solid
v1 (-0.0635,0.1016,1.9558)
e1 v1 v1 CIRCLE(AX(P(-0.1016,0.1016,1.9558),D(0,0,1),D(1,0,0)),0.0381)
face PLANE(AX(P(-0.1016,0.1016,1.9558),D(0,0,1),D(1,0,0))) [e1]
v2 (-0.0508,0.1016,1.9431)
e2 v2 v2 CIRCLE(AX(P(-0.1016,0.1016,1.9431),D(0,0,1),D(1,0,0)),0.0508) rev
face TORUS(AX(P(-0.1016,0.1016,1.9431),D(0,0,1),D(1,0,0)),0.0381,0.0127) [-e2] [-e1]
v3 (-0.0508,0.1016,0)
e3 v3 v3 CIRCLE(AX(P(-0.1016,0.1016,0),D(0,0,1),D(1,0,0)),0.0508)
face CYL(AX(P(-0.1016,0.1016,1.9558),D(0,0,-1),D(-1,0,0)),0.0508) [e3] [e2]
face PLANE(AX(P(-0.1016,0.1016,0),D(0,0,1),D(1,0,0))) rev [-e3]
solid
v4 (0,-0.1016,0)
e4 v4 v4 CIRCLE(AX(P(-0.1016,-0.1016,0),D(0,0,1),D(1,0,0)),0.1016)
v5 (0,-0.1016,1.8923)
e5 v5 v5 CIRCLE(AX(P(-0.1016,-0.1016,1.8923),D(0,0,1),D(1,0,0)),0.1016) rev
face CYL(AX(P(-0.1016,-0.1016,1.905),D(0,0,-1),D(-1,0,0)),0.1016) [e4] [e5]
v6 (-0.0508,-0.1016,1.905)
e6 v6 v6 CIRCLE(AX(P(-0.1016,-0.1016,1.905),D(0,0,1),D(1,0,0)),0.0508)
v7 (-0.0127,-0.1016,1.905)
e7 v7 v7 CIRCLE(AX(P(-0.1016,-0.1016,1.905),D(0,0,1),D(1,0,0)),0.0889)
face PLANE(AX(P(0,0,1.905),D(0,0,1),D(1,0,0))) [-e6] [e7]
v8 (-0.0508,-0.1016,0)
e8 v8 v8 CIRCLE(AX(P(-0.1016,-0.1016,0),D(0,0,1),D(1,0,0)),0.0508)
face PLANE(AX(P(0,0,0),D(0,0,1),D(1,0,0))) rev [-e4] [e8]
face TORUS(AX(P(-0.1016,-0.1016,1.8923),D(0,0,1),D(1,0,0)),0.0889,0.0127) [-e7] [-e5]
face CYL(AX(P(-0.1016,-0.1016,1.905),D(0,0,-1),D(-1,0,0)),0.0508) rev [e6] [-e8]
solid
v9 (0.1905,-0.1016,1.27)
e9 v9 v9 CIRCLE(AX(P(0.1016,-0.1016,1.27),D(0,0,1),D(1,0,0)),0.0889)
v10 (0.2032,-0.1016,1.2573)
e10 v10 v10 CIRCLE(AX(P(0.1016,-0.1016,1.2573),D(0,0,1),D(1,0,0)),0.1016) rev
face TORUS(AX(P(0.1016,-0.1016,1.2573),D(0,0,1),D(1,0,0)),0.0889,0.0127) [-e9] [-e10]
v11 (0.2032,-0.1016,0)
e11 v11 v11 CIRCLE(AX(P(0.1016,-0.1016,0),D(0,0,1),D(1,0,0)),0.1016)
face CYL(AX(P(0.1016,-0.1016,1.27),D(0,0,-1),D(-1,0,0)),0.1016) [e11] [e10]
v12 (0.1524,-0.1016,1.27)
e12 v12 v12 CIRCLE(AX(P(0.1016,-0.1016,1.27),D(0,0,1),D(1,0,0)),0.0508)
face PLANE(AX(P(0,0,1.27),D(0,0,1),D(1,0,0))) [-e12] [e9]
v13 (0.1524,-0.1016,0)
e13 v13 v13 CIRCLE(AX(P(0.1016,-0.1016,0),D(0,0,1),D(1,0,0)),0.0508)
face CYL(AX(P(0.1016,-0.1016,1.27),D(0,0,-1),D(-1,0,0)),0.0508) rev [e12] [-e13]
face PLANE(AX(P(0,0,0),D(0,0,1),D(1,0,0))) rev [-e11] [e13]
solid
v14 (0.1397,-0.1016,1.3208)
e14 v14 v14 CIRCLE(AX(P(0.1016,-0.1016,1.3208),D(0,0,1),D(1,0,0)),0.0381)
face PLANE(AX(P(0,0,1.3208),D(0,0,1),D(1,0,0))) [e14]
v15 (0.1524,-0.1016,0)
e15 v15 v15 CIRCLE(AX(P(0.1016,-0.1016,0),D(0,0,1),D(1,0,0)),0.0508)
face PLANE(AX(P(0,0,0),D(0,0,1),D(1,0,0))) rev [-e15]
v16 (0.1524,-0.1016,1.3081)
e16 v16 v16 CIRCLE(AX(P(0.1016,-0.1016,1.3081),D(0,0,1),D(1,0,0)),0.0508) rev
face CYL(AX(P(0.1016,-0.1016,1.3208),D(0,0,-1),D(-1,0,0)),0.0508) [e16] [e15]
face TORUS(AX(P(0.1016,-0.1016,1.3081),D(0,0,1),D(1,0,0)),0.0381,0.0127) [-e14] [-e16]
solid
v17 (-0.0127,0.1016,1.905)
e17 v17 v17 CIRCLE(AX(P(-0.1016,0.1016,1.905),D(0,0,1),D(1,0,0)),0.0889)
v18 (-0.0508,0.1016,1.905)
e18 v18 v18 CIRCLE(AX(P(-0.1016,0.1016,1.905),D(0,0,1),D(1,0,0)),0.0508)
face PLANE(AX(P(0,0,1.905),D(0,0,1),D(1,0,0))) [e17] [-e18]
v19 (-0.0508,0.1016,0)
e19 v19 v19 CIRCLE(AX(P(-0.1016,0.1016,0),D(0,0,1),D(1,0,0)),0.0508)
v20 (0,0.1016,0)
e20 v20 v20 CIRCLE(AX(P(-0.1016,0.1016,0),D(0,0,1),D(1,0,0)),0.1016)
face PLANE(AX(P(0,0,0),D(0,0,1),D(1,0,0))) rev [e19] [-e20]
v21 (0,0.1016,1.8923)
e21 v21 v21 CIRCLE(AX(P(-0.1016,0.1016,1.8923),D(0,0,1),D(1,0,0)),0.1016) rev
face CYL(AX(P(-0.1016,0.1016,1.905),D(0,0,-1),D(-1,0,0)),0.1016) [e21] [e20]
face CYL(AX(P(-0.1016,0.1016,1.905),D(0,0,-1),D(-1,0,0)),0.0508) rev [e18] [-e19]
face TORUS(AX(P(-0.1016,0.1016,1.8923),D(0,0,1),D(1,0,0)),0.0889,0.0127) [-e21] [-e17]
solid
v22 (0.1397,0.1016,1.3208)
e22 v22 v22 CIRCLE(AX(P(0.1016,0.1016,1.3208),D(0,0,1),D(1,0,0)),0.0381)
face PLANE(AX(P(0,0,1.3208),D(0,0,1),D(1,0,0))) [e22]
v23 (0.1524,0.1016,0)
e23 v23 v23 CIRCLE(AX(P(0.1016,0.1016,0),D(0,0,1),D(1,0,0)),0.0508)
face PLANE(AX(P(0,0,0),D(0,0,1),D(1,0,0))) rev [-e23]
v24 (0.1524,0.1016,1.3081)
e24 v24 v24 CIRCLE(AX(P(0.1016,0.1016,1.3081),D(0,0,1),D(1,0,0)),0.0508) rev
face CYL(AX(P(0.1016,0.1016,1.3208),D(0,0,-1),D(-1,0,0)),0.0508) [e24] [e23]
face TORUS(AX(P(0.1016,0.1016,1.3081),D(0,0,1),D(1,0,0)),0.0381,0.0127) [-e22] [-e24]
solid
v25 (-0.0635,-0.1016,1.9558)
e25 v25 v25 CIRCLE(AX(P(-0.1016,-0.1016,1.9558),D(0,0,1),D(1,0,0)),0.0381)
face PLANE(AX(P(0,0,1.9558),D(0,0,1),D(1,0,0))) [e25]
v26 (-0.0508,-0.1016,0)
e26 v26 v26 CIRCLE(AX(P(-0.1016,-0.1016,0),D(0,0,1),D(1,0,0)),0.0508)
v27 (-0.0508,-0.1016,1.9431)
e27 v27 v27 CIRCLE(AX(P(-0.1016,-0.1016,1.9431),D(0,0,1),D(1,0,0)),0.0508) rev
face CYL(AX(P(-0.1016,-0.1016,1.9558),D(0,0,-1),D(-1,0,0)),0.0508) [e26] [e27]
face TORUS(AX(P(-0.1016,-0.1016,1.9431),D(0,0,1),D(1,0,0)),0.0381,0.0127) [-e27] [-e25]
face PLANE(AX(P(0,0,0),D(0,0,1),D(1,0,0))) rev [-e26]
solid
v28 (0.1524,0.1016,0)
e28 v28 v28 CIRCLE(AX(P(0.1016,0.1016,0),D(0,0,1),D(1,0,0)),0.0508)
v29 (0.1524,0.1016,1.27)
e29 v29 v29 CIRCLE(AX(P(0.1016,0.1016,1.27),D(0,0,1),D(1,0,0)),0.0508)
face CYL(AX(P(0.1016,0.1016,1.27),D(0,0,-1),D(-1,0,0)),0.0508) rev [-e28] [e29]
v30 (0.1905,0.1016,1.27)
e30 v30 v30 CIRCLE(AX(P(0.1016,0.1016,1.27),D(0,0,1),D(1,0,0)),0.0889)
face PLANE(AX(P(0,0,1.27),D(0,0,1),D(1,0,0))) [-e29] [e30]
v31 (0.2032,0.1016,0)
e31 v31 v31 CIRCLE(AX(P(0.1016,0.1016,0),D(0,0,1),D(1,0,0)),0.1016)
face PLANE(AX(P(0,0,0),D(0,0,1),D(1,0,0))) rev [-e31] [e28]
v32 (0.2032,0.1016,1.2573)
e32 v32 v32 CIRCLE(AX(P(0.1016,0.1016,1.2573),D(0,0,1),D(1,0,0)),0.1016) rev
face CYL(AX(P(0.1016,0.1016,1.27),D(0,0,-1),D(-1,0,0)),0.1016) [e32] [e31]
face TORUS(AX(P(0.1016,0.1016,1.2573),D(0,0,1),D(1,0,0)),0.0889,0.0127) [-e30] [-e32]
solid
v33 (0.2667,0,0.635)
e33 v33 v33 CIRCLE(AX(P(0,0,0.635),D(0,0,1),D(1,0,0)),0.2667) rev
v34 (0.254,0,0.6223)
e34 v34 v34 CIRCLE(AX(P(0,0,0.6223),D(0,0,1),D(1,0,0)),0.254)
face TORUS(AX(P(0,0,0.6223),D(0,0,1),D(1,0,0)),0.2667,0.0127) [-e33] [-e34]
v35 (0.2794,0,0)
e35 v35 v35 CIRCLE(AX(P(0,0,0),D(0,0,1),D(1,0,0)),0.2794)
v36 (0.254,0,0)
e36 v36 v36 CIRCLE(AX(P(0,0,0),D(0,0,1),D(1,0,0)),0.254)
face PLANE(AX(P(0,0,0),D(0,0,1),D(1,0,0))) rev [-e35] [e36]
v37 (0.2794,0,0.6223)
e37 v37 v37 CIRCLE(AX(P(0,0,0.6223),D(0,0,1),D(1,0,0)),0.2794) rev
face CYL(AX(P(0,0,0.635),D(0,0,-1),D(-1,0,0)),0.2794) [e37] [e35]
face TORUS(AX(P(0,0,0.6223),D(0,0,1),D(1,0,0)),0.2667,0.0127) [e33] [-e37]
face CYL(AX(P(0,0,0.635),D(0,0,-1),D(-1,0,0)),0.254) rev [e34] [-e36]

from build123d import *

# Parameters (mm, degrees)
SKETCH1_R            = 0.1016
SKETCH1_R_2          = 0.0508
BOSS_EXTRUDE4_DEPTH  = 1.905
SKETCH1_12_R         = 0.1016
SKETCH1_12_R_2       = 0.0508
BOSS_EXTRUDE9_DEPTH  = 1.27
SKETCH1_13_R         = 0.1016
SKETCH1_13_R_2       = 0.0508
BOSS_EXTRUDE10_DEPTH = 1.27
SKETCH1_14_R         = 0.2794
SKETCH1_14_R_2       = 0.254
BOSS_EXTRUDE11_DEPTH = 0.635
SKETCH1_15_R         = 0.1016
SKETCH1_15_R_2       = 0.0508
BOSS_EXTRUDE12_DEPTH = 1.905
SKETCH1_17_R         = 0.0508
BOSS_EXTRUDE14_DEPTH = 1.3208
FILLET2_R            = 0.0127
FILLET5_R            = 0.0127
SKETCH1_18_R         = 0.0508
BOSS_EXTRUDE15_DEPTH = 1.3208
FILLET6_R            = 0.0127
SKETCH1_20_R         = 0.0508
BOSS_EXTRUDE17_DEPTH = 1.9558
FILLET7_R            = 0.0127
SKETCH1_22_R         = 0.0508
BOSS_EXTRUDE19_DEPTH = 1.9558
FILLET8_R            = 0.0127
FILLET9_R            = 0.0127
FILLET10_R           = 0.0127
FILLET11_R           = 0.0127
FILLET12_R           = 0.0127


with BuildPart() as part:
    # Sketch1 → Boss-Extrude4 (new body)
    with BuildSketch(Plane.XY):
        with Locations((-0.1016, -0.1016)):
            Circle(SKETCH1_R)
        with Locations((-0.1016, -0.1016)):
            Circle(SKETCH1_R_2, mode=Mode.SUBTRACT)
    extrude(amount=BOSS_EXTRUDE4_DEPTH)

    # Fillet9
    fillet9_edges = [part.edges().sort_by_distance(p)[0] for p in [
        (-0.2032, -0.1016, 1.905),
    ]]
    fillet(fillet9_edges, radius=FILLET9_R)


with BuildPart() as body_2:
    # Sketch1<12> → Boss-Extrude9 (new body)
    with BuildSketch(Plane.XY):
        with Locations((0.1016, 0.1016)):
            Circle(SKETCH1_12_R)
        with Locations((0.1016, 0.1016)):
            Circle(SKETCH1_12_R_2, mode=Mode.SUBTRACT)
    extrude(amount=BOSS_EXTRUDE9_DEPTH)

    # Fillet11
    fillet11_edges = [body_2.edges().sort_by_distance(p)[0] for p in [
        (0, 0.1016, 1.27),
    ]]
    fillet(fillet11_edges, radius=FILLET11_R)


with BuildPart() as body_3:
    # Sketch1<13> → Boss-Extrude10 (new body)
    with BuildSketch(Plane.XY):
        with Locations((0.1016, -0.1016)):
            Circle(SKETCH1_13_R)
        with Locations((0.1016, -0.1016)):
            Circle(SKETCH1_13_R_2, mode=Mode.SUBTRACT)
    extrude(amount=BOSS_EXTRUDE10_DEPTH)

    # Fillet10
    fillet10_edges = [body_3.edges().sort_by_distance(p)[0] for p in [
        (0, -0.1016, 1.27),
    ]]
    fillet(fillet10_edges, radius=FILLET10_R)


with BuildPart() as body_4:
    # Sketch1<14> → Boss-Extrude11 (new body)
    with BuildSketch(Plane.XY):
        Circle(SKETCH1_14_R)
        Circle(SKETCH1_14_R_2, mode=Mode.SUBTRACT)
    extrude(amount=BOSS_EXTRUDE11_DEPTH)

    # Fillet5
    fillet5_edges = [body_4.edges().sort_by_distance(p)[0] for p in [
        (-0.2794, 0, 0.635),
        (-0.254, 0, 0.635),
    ]]
    fillet(fillet5_edges, radius=FILLET5_R - 0.0001)  # a hair under: the kernel refuses the full size


with BuildPart() as body_5:
    # Sketch1<15> → Boss-Extrude12 (new body)
    with BuildSketch(Plane.XY):
        with Locations((-0.1016, 0.1016)):
            Circle(SKETCH1_15_R)
        with Locations((-0.1016, 0.1016)):
            Circle(SKETCH1_15_R_2, mode=Mode.SUBTRACT)
    extrude(amount=BOSS_EXTRUDE12_DEPTH)

    # Fillet12
    fillet12_edges = [body_5.edges().sort_by_distance(p)[0] for p in [
        (-0.2032, 0.1016, 1.905),
    ]]
    fillet(fillet12_edges, radius=FILLET12_R)


with BuildPart() as body_6:
    # Sketch1<17> → Boss-Extrude14 (new body)
    with BuildSketch(Plane.XY):
        with Locations((0.1016, 0.1016)):
            Circle(SKETCH1_17_R)
    extrude(amount=BOSS_EXTRUDE14_DEPTH)

    # Fillet2
    fillet2_edges = [body_6.edges().sort_by_distance(p)[0] for p in [
        (0.0508, 0.1016, 1.3208),
    ]]
    fillet(fillet2_edges, radius=FILLET2_R)


with BuildPart() as body_7:
    # Sketch1<18> → Boss-Extrude15 (new body)
    with BuildSketch(Plane.XY):
        with Locations((0.1016, -0.1016)):
            Circle(SKETCH1_18_R)
    extrude(amount=BOSS_EXTRUDE15_DEPTH)

    # Fillet6
    fillet6_edges = [body_7.edges().sort_by_distance(p)[0] for p in [
        (0.0508, -0.1016, 1.3208),
    ]]
    fillet(fillet6_edges, radius=FILLET6_R)


with BuildPart() as body_8:
    # Sketch1<20> → Boss-Extrude17 (new body)
    with BuildSketch(Plane.XY):
        with Locations((-0.1016, -0.1016)):
            Circle(SKETCH1_20_R)
    extrude(amount=BOSS_EXTRUDE17_DEPTH)

    # Fillet7
    fillet7_edges = [body_8.edges().sort_by_distance(p)[0] for p in [
        (-0.1524, -0.1016, 1.9558),
    ]]
    fillet(fillet7_edges, radius=FILLET7_R)


with BuildPart() as body_9:
    # Sketch1<22> → Boss-Extrude19 (new body)
    with BuildSketch(Plane.XY):
        with Locations((-0.1016, 0.1016)):
            Circle(SKETCH1_22_R)
    extrude(amount=BOSS_EXTRUDE19_DEPTH)

    # Fillet8
    fillet8_edges = [body_9.edges().sort_by_distance(p)[0] for p in [
        (-0.1524, 0.1016, 1.9558),
    ]]
    fillet(fillet8_edges, radius=FILLET8_R)


solid = Compound([part.part, body_2.part, body_3.part, body_4.part, body_5.part, body_6.part, body_7.part, body_8.part, body_9.part])
